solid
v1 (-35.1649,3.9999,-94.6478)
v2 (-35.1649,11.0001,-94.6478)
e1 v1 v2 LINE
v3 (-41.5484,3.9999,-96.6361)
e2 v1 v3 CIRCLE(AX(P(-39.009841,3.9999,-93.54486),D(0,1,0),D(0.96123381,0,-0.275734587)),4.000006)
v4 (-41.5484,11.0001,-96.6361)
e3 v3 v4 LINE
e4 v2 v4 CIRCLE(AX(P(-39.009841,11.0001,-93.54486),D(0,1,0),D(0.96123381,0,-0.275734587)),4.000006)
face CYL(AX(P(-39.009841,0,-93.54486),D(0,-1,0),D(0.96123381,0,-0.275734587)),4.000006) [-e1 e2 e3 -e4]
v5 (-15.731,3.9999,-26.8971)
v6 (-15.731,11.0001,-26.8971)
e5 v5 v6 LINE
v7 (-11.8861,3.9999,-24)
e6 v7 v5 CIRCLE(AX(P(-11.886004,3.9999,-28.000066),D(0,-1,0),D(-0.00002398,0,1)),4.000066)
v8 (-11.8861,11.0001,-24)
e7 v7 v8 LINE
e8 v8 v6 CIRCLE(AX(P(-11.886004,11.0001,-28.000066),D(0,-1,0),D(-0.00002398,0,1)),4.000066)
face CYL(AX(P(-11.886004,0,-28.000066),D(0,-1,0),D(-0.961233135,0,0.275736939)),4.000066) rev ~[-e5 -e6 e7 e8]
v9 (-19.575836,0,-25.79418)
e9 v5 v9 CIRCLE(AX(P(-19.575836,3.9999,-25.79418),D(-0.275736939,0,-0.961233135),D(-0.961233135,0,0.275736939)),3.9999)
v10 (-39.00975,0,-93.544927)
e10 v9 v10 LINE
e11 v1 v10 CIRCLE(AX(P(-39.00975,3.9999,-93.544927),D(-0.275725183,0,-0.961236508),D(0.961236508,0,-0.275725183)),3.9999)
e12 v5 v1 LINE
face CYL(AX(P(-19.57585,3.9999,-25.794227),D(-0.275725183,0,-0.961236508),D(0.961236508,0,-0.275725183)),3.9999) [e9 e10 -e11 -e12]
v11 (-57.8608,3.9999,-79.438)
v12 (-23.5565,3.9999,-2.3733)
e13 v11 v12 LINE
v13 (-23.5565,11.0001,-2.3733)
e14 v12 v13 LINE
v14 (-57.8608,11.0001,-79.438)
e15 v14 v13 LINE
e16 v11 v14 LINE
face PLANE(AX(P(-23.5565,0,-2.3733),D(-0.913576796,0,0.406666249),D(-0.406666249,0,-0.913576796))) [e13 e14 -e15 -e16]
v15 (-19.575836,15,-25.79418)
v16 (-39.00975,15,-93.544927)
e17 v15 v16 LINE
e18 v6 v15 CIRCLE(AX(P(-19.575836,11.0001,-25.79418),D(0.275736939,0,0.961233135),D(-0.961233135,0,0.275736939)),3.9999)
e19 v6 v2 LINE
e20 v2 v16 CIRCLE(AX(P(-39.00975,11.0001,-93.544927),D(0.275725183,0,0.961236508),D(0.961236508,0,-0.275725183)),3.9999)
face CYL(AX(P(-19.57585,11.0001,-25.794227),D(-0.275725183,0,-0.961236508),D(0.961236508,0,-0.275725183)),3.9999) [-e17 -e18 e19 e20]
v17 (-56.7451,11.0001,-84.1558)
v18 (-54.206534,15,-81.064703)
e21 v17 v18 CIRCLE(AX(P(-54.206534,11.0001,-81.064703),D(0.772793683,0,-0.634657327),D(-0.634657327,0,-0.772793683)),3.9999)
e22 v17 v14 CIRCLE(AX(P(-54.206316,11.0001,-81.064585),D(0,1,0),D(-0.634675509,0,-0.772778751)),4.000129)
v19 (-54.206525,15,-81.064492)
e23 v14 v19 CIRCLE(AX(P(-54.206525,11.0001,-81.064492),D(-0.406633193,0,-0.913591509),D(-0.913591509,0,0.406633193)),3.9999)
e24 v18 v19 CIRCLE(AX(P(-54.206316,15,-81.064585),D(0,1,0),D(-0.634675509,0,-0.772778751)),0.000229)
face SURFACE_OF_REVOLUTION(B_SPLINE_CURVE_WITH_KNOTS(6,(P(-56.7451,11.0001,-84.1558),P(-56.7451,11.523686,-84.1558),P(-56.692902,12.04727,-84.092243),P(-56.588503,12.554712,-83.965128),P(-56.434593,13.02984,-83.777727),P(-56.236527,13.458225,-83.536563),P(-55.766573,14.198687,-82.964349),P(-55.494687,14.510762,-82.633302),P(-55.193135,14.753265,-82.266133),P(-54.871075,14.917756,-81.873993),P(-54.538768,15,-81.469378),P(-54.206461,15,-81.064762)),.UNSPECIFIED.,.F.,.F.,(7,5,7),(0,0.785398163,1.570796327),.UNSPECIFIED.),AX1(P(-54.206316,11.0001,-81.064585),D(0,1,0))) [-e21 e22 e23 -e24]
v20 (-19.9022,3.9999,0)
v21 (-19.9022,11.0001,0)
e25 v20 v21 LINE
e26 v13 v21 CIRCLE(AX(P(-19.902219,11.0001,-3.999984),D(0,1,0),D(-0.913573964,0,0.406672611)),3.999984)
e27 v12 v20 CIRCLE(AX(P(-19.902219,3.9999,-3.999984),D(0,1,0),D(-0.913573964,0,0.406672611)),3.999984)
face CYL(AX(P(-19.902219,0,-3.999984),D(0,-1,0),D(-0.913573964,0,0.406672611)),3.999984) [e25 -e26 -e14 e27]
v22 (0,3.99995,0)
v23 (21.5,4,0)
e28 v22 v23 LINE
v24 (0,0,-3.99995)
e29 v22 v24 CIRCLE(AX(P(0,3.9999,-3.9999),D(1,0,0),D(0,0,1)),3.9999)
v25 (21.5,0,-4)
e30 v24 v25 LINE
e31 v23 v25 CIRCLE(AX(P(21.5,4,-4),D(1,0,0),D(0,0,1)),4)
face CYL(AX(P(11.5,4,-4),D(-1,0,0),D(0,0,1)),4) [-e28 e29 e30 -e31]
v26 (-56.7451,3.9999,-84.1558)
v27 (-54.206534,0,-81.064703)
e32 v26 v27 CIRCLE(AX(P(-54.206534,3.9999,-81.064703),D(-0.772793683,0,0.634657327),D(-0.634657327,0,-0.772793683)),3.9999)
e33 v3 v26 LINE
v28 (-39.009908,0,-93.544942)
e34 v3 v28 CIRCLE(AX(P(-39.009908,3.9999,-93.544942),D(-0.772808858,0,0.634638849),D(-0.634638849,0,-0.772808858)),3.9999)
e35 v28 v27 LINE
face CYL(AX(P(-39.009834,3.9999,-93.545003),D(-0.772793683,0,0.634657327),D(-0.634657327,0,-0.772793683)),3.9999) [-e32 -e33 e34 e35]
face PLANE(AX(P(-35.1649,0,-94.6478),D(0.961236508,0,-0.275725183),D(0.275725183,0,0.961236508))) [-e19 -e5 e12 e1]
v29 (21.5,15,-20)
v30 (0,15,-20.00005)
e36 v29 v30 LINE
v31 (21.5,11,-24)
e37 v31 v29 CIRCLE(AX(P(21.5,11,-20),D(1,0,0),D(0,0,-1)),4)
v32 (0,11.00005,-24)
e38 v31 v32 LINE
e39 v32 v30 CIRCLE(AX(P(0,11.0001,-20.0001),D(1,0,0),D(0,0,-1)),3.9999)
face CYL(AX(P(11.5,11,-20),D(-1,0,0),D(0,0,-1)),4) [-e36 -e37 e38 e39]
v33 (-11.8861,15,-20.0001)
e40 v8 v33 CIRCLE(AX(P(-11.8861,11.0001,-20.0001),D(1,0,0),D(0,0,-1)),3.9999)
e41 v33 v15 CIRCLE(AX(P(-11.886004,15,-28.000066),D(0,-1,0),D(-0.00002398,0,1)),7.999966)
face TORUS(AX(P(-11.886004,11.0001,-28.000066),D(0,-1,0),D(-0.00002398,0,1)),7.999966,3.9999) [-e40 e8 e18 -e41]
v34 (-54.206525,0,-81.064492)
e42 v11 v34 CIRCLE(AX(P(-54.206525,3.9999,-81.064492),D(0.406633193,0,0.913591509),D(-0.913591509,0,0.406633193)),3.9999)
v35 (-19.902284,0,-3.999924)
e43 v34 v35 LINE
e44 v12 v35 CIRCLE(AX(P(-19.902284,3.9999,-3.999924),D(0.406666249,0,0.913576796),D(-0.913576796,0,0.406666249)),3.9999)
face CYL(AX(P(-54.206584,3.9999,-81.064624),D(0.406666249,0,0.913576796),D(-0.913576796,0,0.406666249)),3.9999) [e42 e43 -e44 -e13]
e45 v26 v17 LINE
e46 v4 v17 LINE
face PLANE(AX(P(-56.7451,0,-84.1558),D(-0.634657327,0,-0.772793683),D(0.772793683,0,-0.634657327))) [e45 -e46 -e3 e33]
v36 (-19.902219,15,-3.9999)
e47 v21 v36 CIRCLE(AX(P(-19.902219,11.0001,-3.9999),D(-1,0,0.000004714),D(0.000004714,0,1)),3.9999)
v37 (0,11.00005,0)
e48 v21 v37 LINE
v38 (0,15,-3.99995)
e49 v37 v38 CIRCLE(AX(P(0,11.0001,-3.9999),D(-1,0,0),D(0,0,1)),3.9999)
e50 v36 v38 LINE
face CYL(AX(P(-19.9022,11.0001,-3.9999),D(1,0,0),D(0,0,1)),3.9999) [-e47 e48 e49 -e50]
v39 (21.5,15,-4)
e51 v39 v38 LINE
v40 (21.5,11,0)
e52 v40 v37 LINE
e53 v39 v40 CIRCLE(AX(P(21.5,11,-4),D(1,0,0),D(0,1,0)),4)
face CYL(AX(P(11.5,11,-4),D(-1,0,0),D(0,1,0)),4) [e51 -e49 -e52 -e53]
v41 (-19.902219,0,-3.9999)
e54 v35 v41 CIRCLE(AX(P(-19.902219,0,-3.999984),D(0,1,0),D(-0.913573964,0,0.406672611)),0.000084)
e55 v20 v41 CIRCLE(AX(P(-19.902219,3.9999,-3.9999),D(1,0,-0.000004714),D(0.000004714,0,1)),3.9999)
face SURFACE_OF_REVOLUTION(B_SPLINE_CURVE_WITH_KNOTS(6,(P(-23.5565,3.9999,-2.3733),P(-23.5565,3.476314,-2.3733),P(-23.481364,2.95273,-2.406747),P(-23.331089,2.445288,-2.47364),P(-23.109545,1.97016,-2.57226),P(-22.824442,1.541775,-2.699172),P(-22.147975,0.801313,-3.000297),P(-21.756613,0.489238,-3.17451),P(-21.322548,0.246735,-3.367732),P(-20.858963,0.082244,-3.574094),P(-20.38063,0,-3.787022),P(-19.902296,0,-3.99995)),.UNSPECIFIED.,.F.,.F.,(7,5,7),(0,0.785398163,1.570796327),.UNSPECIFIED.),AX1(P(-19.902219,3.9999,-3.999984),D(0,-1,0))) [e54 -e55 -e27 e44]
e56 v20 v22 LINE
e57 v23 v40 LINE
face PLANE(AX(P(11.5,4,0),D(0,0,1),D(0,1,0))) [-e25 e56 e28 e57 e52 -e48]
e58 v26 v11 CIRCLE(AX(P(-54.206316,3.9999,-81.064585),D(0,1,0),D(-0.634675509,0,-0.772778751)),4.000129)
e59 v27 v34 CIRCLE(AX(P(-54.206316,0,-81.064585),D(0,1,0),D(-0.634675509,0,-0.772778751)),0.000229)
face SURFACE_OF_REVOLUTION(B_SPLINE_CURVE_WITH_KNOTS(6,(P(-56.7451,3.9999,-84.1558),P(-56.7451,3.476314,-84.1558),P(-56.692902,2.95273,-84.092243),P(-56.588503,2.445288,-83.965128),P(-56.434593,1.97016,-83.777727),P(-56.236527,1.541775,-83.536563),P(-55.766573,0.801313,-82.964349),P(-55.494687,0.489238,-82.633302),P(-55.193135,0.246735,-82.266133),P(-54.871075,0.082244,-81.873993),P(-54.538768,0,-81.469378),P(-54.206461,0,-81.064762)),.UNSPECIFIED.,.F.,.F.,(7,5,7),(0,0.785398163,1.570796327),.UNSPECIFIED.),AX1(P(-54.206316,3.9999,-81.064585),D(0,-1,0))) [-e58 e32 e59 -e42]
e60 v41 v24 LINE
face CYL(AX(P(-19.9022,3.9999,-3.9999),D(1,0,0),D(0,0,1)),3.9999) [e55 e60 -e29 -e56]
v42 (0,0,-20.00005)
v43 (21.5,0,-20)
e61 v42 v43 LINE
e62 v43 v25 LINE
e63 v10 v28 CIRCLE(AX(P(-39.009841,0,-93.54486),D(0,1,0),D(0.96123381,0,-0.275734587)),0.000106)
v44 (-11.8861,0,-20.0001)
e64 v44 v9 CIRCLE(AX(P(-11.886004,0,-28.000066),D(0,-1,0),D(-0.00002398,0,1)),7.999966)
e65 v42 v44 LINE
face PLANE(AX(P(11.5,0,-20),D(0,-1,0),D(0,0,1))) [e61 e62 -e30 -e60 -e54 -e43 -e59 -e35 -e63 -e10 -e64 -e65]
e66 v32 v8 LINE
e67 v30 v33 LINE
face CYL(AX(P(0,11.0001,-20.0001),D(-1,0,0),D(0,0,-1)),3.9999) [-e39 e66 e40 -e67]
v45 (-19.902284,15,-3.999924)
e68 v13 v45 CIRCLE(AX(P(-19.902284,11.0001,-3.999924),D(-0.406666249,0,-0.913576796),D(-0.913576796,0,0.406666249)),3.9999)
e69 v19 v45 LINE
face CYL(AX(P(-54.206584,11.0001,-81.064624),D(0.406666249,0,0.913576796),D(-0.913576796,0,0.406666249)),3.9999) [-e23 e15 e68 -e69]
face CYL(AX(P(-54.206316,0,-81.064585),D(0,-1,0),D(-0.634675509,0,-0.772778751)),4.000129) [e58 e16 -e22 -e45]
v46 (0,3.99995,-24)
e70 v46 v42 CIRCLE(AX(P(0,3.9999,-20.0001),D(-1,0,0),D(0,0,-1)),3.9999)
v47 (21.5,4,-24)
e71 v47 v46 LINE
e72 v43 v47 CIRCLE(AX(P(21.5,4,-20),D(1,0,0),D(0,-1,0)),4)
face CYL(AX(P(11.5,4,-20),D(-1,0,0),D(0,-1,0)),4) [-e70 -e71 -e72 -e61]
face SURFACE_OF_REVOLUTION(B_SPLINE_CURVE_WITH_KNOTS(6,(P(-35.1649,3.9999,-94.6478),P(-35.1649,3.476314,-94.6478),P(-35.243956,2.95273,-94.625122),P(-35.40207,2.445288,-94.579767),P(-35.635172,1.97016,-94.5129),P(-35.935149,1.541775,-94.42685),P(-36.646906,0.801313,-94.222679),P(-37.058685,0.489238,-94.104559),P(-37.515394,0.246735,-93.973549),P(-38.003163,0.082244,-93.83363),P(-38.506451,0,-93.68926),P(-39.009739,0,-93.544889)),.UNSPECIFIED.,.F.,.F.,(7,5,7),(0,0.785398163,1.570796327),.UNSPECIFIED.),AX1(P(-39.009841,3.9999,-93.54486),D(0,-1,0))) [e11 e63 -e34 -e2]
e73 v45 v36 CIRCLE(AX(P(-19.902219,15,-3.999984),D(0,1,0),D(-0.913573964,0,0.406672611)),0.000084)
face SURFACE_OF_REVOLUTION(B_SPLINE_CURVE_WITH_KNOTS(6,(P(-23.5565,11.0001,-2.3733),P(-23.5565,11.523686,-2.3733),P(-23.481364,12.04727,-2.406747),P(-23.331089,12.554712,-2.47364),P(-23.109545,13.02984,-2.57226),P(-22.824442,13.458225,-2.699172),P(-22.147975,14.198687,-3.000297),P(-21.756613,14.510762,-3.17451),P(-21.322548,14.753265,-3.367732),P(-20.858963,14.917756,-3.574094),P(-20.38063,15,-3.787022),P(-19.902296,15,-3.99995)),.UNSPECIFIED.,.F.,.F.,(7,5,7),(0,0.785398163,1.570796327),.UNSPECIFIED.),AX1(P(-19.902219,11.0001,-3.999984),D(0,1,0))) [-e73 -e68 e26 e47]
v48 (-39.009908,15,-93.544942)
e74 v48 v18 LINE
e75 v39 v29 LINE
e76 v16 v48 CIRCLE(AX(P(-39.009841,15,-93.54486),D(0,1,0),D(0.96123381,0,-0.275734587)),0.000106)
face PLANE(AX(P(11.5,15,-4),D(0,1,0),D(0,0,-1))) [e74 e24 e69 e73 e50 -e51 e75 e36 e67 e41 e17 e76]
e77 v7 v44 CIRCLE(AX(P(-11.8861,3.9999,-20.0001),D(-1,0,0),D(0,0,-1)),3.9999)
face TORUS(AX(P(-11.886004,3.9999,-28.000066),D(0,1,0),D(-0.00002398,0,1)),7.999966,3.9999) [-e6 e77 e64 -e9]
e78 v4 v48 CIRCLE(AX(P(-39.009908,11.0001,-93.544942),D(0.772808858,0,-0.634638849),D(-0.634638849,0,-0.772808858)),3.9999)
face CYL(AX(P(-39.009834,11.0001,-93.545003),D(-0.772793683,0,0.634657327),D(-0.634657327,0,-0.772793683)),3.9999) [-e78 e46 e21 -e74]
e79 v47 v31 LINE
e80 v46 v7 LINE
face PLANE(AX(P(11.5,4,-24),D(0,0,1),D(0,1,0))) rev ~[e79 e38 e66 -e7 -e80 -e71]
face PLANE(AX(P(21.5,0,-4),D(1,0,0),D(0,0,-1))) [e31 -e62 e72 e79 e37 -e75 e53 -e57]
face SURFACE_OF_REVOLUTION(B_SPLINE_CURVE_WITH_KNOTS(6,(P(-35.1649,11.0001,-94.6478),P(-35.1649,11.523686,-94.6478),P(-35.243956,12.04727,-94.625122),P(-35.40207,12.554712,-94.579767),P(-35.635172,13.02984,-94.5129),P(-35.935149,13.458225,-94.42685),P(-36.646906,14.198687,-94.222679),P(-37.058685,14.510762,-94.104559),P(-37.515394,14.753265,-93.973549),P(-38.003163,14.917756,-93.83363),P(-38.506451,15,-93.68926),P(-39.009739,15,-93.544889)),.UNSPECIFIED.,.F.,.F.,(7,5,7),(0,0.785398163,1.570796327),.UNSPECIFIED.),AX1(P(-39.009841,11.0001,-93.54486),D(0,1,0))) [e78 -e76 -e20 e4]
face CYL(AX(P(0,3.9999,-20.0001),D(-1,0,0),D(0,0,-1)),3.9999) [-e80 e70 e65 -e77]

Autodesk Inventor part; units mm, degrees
ref_plane "YZ Plane" through (0, 0, 0) normal (1, 0, 0) x (0, 1, 0)
ref_plane "XZ Plane" through (0, 0, 0) normal (0, 1, 0) x (-1, 0, 0)
ref_plane "XY Plane" through (0, 0, 0) normal (0, 0, 1) x (1, 0, 0)
sketch "Sketch4" plane through (0, 0, 0) normal (0, 1, 0) x (-1, 0, 0)
  line L0 (23.5565, -2.3733) -> (57.8608, -79.438)
  line L1 (0, 0) -> (0, -24)
  line L2 (0, -24) -> (11.8861, -24)
  line L3 (56.7451, -84.1558) -> (41.5484, -96.6361)
  line L4 (35.1649, -94.6478) -> (15.731, -26.8971)
  line L5 (19.9022, 0) -> (0, 0)
  arc A0 (15.731, -26.8971) -> (11.8861, -24) centre (11.8861, -28) ccw
  arc A1 (23.5565, -2.3733) -> (19.9022, 0) centre (19.9022, -4) ccw
  arc A2 (56.7451, -84.1558) -> (57.8608, -79.438) centre (54.2065, -81.0647) ccw
  arc A3 (35.1649, -94.6478) -> (41.5484, -96.6361) centre (39.0098, -93.5449) ccw
  point P0 (22.5, 0)
  point P1 (59.1, -82.2219)
  point P2 (36.8435, -100.5)
  dimension "d40" = 22.5
  dimension "d41" = 90
  dimension "d43" = 24
  dimension "d44" = 28.8
  dimension "d45" = 4
extrude "Extrusion3" add sketch "Sketch4" along normal blind 15
fillet "Fillet3" radius 4 18 edges at (-37.8203, 15, -97.364) (-49.1468, 15, -90.396) (-58.0991, 15, -81.9852) (-40.7086, 15, -40.9057) (-22.0808, 15, -0.6454) (-9.9511, 15, 0) (-14.2932, 15, -24.8053) (-5.943, 15, -24) (-25.4479, 15, -60.7725) (-37.8203, 0, -97.364) (-49.1468, 0, -90.396) (-58.0991, 0, -81.9852) (-40.7086, 0, -40.9057) (-22.0808, 0, -0.6454) (-9.9511, 0, 0) (-14.2932, 0, -24.8053) (-5.943, 0, -24) (-25.4479, 0, -60.7725)
sketch "Sketch5" plane through (0, 0, -4) normal (1, 0, 0) x (0, 0, -1)
  line L0 (-4, 4) -> (-4, 11) projected
  line L1 (-4, 7.5) -> (1.9, 7.5)
  point P0 (-4, 0)
  dimension "d49" = 5.9
sketch "Sketch6" plane through (0, 0, -4) normal (1, 0, 0) x (0, 0, -1)
  line L0 (0, 0) -> (16, 0) projected
  line L1 (20, 4) -> (20, 11) projected
  arc A0 (16, 0) -> (20, 4) centre (16, 4) ccw
  arc A1 (-4, 4) -> (0, 0) centre (0, 4) ccw projected
  arc A2 (0, 15) -> (-4, 11) centre (0, 11) ccw projected
  arc A3 (0, 15) -> (0, 15) centre (0, 11) ccw
  arc A4 (20, 11) -> (16, 15) centre (16, 11) ccw projected
  line L2 (16, 15) -> (0, 15)
  line L3 (-4, 4) -> (-4, 11) projected
  line L4 (-4, 11) -> (-4, 4)
  arc A5 (0, 15) -> (-4, 11) centre (0, 11) ccw projected
  point P0 (-4, 0)
extrude "Extrusion4" add sketch "Sketch6" along normal blind 11.5
sketch "Sketch7" plane through (11.5, 0, -4) normal (1, 0, 0) x (0, 0, -1)
  point P0 (-4, 0)
sketch "Sketch8" plane through (11.5, 0, -4) normal (1, 0, 0) x (0, 0, -1)
  line L0 (-4, 4) -> (-4, 11) projected
  arc A0 (16, 0) -> (20, 4) centre (16, 4) ccw projected
  line L1 (20, 4) -> (20, 11) projected
  line L2 (20, 4) -> (20, 11)
  line L3 (77.0647, 0) -> (0, 0) projected
  arc A1 (-4, 4) -> (0, 0) centre (0, 4) ccw projected
  line L4 (16, 0) -> (0, 0)
  arc A2 (20, 11) -> (16, 15) centre (16, 11) ccw projected
  line L5 (0, 15) -> (77.0647, 15) projected
  line L6 (16, 15) -> (0, 15)
  arc A3 (20, 11) -> (16, 15) centre (16, 11) ccw
  arc A4 (16, 0.4098) -> (20, 4) centre (16.6189, 3.7436) ccw
  arc A5 (-4, 4) -> (0, 0) centre (0, 4) ccw
  ellipse E0 centre (0, 11) end of major axis (0, 15) minor radius 1.6267 (0, 15) -> (-1.6267, 11) ccw projected
  arc A6 (0, 15) -> (-4, 11) centre (0, 11) ccw
  point P0 (-4, 0)
extrude "Extrusion5" add sketch "Sketch8" along normal blind 10 contours L0 A6 L5 A2 L1 A0 L3 A1
sketch "Sketch9" plane through (21.5, 0, -4) normal (1, 0, 0) x (0, 0, -1)
  line L0 (-4, 4) -> (-4, 11) projected
  line L1 (-4, 7.5) -> (1.9, 7.5)
  point P0 (-4, 0)
  dimension "d56" = 5.9
sketch "Sketch10" plane through (21.5, 0, -4) normal (1, 0, 0) x (0, 0, -1)
  line L0 (-4, 4) -> (-4, 11) projected
  line L1 (-4, 7.5) -> (1.9, 7.5)
  point P0 (-4, 0)
  dimension "d57" = 5.9
properties part number "Handle Gearbox handle"
